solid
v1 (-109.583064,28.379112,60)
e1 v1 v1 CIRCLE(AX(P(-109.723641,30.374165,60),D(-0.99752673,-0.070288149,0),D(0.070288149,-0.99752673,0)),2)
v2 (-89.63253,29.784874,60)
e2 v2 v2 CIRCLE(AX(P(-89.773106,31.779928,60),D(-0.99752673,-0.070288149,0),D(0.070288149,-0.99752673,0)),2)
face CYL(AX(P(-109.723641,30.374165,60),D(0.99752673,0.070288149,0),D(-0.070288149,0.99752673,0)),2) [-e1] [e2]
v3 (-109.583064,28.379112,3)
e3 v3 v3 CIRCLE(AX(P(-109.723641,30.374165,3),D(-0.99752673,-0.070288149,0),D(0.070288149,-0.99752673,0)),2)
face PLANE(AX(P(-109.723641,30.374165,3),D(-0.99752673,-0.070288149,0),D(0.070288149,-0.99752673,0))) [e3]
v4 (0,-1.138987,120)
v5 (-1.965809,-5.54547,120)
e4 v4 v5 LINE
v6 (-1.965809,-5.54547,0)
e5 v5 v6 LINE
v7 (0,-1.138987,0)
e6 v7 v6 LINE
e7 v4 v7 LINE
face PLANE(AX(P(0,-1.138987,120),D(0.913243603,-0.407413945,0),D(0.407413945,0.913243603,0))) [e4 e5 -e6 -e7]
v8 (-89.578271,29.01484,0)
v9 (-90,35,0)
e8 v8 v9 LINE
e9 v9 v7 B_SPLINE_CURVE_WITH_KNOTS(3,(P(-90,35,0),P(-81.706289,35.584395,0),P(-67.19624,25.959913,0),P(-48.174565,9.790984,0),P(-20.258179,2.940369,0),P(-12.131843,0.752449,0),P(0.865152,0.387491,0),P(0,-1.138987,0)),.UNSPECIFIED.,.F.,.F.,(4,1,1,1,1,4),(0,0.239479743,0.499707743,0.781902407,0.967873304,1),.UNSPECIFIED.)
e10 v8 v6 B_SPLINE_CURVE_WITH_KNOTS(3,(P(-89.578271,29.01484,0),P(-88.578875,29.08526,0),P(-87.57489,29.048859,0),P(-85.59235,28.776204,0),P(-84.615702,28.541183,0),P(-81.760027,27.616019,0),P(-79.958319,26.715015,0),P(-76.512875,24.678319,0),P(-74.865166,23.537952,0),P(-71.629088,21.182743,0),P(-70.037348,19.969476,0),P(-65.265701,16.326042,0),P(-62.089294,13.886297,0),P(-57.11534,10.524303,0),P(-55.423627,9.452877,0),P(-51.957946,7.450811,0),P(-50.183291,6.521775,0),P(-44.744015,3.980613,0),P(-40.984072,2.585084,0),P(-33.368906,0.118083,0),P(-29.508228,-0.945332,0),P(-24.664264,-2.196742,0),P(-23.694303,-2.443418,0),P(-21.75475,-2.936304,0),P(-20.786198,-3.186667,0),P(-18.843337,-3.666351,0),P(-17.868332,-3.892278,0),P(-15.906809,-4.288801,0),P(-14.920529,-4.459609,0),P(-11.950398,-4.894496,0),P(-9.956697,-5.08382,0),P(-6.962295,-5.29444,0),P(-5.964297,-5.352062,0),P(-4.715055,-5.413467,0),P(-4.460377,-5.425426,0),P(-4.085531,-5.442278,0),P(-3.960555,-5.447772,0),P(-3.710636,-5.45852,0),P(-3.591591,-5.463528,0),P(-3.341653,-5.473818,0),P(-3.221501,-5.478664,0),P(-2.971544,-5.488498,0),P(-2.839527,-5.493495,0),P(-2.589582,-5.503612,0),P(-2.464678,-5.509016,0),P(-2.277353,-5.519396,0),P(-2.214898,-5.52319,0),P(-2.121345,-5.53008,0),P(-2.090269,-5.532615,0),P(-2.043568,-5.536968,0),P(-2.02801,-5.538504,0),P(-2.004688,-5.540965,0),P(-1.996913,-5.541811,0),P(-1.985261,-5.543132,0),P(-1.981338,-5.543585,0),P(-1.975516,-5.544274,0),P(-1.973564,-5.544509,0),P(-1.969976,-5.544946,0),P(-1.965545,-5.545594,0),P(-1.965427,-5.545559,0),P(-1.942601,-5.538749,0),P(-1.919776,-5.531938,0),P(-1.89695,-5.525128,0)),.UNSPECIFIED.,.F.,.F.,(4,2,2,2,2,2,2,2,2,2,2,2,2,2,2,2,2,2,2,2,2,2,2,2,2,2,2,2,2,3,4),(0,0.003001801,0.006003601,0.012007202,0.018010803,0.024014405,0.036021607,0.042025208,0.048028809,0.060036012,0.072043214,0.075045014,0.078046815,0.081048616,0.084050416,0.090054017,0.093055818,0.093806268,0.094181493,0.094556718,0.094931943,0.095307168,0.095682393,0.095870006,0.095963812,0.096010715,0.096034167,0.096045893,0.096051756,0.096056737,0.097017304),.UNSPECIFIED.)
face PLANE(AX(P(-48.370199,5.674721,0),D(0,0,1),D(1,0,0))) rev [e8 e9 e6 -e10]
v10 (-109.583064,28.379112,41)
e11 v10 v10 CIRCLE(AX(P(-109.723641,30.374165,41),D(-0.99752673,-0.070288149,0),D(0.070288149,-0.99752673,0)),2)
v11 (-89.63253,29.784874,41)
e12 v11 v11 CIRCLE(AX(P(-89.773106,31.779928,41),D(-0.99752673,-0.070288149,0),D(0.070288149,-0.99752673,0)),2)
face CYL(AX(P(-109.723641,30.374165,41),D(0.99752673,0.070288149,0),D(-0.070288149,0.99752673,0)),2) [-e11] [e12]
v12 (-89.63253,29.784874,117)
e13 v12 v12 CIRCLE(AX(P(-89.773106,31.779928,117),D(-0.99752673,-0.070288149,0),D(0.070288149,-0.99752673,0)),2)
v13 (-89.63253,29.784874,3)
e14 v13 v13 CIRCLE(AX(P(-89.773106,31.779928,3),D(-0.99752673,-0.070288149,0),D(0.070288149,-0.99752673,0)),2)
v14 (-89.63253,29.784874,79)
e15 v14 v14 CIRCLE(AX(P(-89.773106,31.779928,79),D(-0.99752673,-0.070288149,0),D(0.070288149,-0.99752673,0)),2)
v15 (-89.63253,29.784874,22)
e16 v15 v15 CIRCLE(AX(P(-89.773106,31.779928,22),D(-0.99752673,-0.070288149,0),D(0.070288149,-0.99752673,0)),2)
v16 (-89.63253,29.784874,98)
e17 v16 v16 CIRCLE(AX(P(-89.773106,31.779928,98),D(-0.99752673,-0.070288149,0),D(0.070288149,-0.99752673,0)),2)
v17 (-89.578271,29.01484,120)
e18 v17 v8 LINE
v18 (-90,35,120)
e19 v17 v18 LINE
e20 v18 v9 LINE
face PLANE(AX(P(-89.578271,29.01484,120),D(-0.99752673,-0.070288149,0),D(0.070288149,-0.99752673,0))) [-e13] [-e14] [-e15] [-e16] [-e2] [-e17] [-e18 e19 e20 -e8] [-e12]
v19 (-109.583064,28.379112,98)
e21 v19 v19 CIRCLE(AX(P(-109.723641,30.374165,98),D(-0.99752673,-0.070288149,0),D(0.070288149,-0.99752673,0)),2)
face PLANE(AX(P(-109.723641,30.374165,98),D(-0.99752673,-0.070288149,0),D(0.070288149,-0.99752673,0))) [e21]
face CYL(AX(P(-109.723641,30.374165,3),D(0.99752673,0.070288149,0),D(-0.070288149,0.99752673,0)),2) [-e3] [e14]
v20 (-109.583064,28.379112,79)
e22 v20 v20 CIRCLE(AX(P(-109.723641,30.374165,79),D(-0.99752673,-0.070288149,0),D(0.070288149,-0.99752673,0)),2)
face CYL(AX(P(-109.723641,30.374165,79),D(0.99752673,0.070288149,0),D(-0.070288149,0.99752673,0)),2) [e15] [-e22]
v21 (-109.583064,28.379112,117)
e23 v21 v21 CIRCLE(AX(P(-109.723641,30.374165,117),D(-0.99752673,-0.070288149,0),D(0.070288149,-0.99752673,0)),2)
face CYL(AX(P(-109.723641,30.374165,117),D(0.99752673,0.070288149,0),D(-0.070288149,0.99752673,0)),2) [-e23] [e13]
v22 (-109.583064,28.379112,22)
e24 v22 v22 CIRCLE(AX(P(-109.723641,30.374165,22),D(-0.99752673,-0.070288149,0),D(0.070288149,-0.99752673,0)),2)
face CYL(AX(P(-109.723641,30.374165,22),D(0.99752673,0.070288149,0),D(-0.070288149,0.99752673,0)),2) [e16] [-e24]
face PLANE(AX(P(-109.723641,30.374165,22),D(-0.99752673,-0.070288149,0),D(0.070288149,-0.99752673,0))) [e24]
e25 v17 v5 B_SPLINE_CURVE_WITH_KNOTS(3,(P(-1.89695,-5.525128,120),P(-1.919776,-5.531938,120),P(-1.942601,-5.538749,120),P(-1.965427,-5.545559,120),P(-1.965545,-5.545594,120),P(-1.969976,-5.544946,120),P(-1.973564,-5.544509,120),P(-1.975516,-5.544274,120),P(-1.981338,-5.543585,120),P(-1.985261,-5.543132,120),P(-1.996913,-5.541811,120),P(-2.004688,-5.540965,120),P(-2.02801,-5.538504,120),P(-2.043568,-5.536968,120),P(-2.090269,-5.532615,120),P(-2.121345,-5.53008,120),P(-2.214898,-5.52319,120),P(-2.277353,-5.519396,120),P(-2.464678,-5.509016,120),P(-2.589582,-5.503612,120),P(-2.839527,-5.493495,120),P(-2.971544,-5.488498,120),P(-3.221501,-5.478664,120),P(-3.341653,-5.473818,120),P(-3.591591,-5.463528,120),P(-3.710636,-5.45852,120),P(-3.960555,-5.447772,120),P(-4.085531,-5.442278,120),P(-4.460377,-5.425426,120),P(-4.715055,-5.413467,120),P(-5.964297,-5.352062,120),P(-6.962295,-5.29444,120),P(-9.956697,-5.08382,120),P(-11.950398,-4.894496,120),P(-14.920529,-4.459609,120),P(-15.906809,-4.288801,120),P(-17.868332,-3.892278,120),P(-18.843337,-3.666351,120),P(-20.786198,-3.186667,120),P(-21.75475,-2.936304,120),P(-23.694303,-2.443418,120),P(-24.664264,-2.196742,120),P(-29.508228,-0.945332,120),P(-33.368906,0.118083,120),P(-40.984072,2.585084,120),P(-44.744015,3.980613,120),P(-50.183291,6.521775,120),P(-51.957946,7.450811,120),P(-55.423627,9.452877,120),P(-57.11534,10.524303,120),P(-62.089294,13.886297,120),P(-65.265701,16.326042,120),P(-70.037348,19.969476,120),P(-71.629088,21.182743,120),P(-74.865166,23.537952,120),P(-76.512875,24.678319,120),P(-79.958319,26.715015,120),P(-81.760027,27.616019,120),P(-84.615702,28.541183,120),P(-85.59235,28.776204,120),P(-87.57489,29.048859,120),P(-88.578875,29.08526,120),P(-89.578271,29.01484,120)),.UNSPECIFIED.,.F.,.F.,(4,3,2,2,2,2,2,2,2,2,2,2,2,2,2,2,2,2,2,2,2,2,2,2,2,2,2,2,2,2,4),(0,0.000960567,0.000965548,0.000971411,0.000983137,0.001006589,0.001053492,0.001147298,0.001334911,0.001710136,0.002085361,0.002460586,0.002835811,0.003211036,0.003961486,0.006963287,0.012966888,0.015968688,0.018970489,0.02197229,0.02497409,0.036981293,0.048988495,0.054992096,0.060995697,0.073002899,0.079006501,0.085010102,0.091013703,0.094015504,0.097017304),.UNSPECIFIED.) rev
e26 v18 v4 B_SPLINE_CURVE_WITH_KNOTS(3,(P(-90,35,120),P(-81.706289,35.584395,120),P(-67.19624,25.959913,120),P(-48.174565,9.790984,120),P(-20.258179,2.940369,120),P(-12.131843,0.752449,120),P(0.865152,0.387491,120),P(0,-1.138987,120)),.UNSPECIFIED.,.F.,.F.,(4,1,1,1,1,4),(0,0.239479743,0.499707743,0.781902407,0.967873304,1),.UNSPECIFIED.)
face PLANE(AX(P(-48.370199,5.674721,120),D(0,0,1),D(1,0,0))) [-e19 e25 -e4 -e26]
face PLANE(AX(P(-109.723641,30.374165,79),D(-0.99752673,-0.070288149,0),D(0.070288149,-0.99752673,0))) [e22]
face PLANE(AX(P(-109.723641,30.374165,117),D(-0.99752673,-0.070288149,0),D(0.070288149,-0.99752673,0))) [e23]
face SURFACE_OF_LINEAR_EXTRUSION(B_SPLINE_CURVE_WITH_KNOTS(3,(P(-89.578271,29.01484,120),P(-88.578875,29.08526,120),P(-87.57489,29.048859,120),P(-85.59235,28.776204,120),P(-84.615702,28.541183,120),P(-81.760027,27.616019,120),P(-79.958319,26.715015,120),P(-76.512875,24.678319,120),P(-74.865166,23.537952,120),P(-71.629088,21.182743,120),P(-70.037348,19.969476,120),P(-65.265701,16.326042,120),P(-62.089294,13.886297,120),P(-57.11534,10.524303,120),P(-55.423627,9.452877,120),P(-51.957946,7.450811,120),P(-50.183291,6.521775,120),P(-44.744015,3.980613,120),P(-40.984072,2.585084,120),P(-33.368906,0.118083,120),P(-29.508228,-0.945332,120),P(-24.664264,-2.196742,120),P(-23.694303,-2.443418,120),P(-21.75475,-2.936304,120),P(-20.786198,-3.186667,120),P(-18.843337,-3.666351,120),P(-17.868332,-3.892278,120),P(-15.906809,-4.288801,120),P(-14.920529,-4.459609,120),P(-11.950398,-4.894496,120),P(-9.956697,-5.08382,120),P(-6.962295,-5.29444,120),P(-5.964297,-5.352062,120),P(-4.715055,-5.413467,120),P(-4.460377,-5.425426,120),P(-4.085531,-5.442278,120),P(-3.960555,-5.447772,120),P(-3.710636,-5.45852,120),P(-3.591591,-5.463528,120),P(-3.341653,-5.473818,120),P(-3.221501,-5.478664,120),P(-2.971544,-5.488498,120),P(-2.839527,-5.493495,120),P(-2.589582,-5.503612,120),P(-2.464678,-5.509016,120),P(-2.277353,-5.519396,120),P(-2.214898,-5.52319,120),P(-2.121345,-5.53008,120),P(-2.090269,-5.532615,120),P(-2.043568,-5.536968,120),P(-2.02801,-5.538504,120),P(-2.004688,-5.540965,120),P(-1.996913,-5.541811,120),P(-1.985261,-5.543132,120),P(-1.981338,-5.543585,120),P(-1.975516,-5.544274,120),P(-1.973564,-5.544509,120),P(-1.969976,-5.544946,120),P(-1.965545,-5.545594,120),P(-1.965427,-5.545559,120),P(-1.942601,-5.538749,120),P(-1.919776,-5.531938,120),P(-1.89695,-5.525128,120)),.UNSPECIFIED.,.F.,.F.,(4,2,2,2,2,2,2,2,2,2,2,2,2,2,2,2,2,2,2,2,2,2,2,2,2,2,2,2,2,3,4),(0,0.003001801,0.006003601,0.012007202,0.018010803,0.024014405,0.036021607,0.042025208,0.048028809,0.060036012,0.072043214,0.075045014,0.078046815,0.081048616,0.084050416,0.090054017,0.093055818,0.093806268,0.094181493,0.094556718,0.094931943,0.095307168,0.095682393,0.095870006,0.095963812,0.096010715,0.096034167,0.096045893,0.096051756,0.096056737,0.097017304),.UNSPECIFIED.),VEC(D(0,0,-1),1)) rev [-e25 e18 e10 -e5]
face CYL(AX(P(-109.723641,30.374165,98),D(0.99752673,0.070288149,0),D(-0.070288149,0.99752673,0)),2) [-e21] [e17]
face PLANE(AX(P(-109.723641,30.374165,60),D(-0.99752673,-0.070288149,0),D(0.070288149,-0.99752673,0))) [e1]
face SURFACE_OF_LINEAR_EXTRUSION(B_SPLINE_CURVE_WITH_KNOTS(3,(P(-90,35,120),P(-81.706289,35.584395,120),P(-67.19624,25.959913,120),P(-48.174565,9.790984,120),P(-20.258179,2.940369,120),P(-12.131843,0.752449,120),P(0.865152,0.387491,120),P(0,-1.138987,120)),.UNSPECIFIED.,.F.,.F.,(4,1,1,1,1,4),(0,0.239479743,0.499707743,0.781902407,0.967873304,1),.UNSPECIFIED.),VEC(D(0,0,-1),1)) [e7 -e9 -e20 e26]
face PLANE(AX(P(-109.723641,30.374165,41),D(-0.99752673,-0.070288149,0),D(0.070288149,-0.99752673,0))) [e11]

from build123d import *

# Parameters (mm, degrees)
EXTRUDE_1_DEPTH   = 120
SKETCH_3_R        = 2
EXTRUDE_1_2_DEPTH = 20


# Read off the part's stored shape, not the designer's step: 拉伸-薄壁1
with BuildPart() as part:
    # Extrude 1 outline → Extrude 1 (new body)
    with BuildSketch(Plane.XY):
        with BuildLine():
            Line((-90, 35), (-89.578271107, 29.014839623))
            add(Edge.make_bspline(
                [(-89.578271107, 29.014839623), (-88.578874571, 29.085259523), (-87.574889593, 29.048858893), (-85.592350242, 28.776203967), (-84.615701854, 28.541183309), (-81.760027281, 27.616018756), (-79.958318561, 26.715014824), (-76.512874957, 24.678318893), (-74.865166107, 23.537951956), (-71.629088076, 21.182742641), (-70.037348112, 19.969475657), (-65.265700573, 16.326042299), (-62.089293712, 13.88629703), (-57.115339555, 10.524302545), (-55.423627222, 9.452876869), (-51.957946298, 7.450811016), (-50.183291101, 6.5217753), (-44.744015376, 3.980612877), (-40.984072011, 2.585084421), (-33.368905969, 0.118083424), (-29.508228436, -0.945331912), (-24.664264106, -2.196742408), (-23.69430338, -2.443417589), (-21.7547503, -2.936303819), (-20.786197835, -3.186667183), (-18.843337423, -3.666350834), (-17.868332339, -3.892277695), (-15.90680944, -4.288801215), (-14.920529134, -4.459608803), (-11.95039781, -4.894495725), (-9.956696951, -5.083820355), (-6.962294502, -5.294440132), (-5.964296689, -5.352062276), (-4.715054663, -5.413466901), (-4.460377342, -5.42542648), (-4.085530854, -5.442277748), (-3.960555017, -5.44777159), (-3.710635988, -5.458519853), (-3.591591353, -5.46352797), (-3.341653054, -5.473818413), (-3.221501066, -5.478664365), (-2.971544382, -5.488498109), (-2.839527208, -5.493494838), (-2.589581836, -5.503612046), (-2.464678275, -5.509016079), (-2.277353095, -5.519395903), (-2.214897658, -5.523189562), (-2.121344789, -5.530079886), (-2.090269007, -5.532615341), (-2.043568315, -5.536968425), (-2.028009822, -5.538504155), (-2.004687692, -5.540964692), (-1.99691268, -5.541811421), (-1.985261446, -5.543131556), (-1.981338307, -5.543584738), (-1.975516121, -5.54427441), (-1.973563741, -5.544508553), (-1.970251448, -5.544912396), (-1.966950162, -5.545389755), (-1.965815411, -5.54552444)],
                knots=[0, 0, 0, 0, 0.003001801, 0.003001801, 0.006003601, 0.006003601, 0.012007202, 0.012007202, 0.018010803, 0.018010803, 0.024014405, 0.024014405, 0.036021607, 0.036021607, 0.042025208, 0.042025208, 0.048028809, 0.048028809, 0.060036012, 0.060036012, 0.072043214, 0.072043214, 0.075045014, 0.075045014, 0.078046815, 0.078046815, 0.081048616, 0.081048616, 0.084050416, 0.084050416, 0.090054017, 0.090054017, 0.093055818, 0.093055818, 0.093806268, 0.093806268, 0.094181493, 0.094181493, 0.094556718, 0.094556718, 0.094931943, 0.094931943, 0.095307168, 0.095307168, 0.095682393, 0.095682393, 0.095870006, 0.095870006, 0.095963812, 0.095963812, 0.096010715, 0.096010715, 0.096034167, 0.096034167, 0.096045893, 0.096045893, 0.096051756, 0.096051756, 0.096055903, 0.096055903, 0.096055903, 0.096055903], degree=3))
            Line((-1.965815411, -5.54552444), (0, -1.138987092))
            add(Edge.make_bspline(
                [(-90, 35), (-81.70628867, 35.584394983), (-67.196239938, 25.959913143), (-48.174565102, 9.790984398), (-20.258178644, 2.940369417), (-12.131843338, 0.752448898), (0.865152012, 0.38749064), (0, -1.138987092)],
                knots=[0, 0, 0, 0, 0.239479743, 0.499707743, 0.781902407, 0.967873304, 1, 1, 1, 1], degree=3))
        make_face()
    extrude(amount=EXTRUDE_1_DEPTH)

    # 草图3 → Extrude 1 2 (add)
    with BuildSketch(Plane(origin=(-87.101361099, -6.137372816, 0), x_dir=(0, 0, 1), z_dir=(-0.9975267295328711, -0.07028814884071229, 0))):
        with Locations(Location((60, 38.011313019, 0), (0, 0, 270))):
            Circle(SKETCH_3_R)
        with Locations(Location((79, 38.011313019, 0), (0, 0, 270))):
            Circle(SKETCH_3_R)
        with Locations(Location((98, 38.011313019, 0), (0, 0, 270))):
            Circle(SKETCH_3_R)
        with Locations(Location((117, 38.011313019, 0), (0, 0, 270))):
            Circle(SKETCH_3_R)
        with Locations(Location((3, 38.011313019, 0), (0, 0, 270))):
            Circle(SKETCH_3_R)
        with Locations(Location((22, 38.011313019, 0), (0, 0, 270))):
            Circle(SKETCH_3_R)
        with Locations(Location((41, 38.011313019, 0), (0, 0, 270))):
            Circle(SKETCH_3_R)
    extrude(amount=EXTRUDE_1_2_DEPTH)


solid = part.part
